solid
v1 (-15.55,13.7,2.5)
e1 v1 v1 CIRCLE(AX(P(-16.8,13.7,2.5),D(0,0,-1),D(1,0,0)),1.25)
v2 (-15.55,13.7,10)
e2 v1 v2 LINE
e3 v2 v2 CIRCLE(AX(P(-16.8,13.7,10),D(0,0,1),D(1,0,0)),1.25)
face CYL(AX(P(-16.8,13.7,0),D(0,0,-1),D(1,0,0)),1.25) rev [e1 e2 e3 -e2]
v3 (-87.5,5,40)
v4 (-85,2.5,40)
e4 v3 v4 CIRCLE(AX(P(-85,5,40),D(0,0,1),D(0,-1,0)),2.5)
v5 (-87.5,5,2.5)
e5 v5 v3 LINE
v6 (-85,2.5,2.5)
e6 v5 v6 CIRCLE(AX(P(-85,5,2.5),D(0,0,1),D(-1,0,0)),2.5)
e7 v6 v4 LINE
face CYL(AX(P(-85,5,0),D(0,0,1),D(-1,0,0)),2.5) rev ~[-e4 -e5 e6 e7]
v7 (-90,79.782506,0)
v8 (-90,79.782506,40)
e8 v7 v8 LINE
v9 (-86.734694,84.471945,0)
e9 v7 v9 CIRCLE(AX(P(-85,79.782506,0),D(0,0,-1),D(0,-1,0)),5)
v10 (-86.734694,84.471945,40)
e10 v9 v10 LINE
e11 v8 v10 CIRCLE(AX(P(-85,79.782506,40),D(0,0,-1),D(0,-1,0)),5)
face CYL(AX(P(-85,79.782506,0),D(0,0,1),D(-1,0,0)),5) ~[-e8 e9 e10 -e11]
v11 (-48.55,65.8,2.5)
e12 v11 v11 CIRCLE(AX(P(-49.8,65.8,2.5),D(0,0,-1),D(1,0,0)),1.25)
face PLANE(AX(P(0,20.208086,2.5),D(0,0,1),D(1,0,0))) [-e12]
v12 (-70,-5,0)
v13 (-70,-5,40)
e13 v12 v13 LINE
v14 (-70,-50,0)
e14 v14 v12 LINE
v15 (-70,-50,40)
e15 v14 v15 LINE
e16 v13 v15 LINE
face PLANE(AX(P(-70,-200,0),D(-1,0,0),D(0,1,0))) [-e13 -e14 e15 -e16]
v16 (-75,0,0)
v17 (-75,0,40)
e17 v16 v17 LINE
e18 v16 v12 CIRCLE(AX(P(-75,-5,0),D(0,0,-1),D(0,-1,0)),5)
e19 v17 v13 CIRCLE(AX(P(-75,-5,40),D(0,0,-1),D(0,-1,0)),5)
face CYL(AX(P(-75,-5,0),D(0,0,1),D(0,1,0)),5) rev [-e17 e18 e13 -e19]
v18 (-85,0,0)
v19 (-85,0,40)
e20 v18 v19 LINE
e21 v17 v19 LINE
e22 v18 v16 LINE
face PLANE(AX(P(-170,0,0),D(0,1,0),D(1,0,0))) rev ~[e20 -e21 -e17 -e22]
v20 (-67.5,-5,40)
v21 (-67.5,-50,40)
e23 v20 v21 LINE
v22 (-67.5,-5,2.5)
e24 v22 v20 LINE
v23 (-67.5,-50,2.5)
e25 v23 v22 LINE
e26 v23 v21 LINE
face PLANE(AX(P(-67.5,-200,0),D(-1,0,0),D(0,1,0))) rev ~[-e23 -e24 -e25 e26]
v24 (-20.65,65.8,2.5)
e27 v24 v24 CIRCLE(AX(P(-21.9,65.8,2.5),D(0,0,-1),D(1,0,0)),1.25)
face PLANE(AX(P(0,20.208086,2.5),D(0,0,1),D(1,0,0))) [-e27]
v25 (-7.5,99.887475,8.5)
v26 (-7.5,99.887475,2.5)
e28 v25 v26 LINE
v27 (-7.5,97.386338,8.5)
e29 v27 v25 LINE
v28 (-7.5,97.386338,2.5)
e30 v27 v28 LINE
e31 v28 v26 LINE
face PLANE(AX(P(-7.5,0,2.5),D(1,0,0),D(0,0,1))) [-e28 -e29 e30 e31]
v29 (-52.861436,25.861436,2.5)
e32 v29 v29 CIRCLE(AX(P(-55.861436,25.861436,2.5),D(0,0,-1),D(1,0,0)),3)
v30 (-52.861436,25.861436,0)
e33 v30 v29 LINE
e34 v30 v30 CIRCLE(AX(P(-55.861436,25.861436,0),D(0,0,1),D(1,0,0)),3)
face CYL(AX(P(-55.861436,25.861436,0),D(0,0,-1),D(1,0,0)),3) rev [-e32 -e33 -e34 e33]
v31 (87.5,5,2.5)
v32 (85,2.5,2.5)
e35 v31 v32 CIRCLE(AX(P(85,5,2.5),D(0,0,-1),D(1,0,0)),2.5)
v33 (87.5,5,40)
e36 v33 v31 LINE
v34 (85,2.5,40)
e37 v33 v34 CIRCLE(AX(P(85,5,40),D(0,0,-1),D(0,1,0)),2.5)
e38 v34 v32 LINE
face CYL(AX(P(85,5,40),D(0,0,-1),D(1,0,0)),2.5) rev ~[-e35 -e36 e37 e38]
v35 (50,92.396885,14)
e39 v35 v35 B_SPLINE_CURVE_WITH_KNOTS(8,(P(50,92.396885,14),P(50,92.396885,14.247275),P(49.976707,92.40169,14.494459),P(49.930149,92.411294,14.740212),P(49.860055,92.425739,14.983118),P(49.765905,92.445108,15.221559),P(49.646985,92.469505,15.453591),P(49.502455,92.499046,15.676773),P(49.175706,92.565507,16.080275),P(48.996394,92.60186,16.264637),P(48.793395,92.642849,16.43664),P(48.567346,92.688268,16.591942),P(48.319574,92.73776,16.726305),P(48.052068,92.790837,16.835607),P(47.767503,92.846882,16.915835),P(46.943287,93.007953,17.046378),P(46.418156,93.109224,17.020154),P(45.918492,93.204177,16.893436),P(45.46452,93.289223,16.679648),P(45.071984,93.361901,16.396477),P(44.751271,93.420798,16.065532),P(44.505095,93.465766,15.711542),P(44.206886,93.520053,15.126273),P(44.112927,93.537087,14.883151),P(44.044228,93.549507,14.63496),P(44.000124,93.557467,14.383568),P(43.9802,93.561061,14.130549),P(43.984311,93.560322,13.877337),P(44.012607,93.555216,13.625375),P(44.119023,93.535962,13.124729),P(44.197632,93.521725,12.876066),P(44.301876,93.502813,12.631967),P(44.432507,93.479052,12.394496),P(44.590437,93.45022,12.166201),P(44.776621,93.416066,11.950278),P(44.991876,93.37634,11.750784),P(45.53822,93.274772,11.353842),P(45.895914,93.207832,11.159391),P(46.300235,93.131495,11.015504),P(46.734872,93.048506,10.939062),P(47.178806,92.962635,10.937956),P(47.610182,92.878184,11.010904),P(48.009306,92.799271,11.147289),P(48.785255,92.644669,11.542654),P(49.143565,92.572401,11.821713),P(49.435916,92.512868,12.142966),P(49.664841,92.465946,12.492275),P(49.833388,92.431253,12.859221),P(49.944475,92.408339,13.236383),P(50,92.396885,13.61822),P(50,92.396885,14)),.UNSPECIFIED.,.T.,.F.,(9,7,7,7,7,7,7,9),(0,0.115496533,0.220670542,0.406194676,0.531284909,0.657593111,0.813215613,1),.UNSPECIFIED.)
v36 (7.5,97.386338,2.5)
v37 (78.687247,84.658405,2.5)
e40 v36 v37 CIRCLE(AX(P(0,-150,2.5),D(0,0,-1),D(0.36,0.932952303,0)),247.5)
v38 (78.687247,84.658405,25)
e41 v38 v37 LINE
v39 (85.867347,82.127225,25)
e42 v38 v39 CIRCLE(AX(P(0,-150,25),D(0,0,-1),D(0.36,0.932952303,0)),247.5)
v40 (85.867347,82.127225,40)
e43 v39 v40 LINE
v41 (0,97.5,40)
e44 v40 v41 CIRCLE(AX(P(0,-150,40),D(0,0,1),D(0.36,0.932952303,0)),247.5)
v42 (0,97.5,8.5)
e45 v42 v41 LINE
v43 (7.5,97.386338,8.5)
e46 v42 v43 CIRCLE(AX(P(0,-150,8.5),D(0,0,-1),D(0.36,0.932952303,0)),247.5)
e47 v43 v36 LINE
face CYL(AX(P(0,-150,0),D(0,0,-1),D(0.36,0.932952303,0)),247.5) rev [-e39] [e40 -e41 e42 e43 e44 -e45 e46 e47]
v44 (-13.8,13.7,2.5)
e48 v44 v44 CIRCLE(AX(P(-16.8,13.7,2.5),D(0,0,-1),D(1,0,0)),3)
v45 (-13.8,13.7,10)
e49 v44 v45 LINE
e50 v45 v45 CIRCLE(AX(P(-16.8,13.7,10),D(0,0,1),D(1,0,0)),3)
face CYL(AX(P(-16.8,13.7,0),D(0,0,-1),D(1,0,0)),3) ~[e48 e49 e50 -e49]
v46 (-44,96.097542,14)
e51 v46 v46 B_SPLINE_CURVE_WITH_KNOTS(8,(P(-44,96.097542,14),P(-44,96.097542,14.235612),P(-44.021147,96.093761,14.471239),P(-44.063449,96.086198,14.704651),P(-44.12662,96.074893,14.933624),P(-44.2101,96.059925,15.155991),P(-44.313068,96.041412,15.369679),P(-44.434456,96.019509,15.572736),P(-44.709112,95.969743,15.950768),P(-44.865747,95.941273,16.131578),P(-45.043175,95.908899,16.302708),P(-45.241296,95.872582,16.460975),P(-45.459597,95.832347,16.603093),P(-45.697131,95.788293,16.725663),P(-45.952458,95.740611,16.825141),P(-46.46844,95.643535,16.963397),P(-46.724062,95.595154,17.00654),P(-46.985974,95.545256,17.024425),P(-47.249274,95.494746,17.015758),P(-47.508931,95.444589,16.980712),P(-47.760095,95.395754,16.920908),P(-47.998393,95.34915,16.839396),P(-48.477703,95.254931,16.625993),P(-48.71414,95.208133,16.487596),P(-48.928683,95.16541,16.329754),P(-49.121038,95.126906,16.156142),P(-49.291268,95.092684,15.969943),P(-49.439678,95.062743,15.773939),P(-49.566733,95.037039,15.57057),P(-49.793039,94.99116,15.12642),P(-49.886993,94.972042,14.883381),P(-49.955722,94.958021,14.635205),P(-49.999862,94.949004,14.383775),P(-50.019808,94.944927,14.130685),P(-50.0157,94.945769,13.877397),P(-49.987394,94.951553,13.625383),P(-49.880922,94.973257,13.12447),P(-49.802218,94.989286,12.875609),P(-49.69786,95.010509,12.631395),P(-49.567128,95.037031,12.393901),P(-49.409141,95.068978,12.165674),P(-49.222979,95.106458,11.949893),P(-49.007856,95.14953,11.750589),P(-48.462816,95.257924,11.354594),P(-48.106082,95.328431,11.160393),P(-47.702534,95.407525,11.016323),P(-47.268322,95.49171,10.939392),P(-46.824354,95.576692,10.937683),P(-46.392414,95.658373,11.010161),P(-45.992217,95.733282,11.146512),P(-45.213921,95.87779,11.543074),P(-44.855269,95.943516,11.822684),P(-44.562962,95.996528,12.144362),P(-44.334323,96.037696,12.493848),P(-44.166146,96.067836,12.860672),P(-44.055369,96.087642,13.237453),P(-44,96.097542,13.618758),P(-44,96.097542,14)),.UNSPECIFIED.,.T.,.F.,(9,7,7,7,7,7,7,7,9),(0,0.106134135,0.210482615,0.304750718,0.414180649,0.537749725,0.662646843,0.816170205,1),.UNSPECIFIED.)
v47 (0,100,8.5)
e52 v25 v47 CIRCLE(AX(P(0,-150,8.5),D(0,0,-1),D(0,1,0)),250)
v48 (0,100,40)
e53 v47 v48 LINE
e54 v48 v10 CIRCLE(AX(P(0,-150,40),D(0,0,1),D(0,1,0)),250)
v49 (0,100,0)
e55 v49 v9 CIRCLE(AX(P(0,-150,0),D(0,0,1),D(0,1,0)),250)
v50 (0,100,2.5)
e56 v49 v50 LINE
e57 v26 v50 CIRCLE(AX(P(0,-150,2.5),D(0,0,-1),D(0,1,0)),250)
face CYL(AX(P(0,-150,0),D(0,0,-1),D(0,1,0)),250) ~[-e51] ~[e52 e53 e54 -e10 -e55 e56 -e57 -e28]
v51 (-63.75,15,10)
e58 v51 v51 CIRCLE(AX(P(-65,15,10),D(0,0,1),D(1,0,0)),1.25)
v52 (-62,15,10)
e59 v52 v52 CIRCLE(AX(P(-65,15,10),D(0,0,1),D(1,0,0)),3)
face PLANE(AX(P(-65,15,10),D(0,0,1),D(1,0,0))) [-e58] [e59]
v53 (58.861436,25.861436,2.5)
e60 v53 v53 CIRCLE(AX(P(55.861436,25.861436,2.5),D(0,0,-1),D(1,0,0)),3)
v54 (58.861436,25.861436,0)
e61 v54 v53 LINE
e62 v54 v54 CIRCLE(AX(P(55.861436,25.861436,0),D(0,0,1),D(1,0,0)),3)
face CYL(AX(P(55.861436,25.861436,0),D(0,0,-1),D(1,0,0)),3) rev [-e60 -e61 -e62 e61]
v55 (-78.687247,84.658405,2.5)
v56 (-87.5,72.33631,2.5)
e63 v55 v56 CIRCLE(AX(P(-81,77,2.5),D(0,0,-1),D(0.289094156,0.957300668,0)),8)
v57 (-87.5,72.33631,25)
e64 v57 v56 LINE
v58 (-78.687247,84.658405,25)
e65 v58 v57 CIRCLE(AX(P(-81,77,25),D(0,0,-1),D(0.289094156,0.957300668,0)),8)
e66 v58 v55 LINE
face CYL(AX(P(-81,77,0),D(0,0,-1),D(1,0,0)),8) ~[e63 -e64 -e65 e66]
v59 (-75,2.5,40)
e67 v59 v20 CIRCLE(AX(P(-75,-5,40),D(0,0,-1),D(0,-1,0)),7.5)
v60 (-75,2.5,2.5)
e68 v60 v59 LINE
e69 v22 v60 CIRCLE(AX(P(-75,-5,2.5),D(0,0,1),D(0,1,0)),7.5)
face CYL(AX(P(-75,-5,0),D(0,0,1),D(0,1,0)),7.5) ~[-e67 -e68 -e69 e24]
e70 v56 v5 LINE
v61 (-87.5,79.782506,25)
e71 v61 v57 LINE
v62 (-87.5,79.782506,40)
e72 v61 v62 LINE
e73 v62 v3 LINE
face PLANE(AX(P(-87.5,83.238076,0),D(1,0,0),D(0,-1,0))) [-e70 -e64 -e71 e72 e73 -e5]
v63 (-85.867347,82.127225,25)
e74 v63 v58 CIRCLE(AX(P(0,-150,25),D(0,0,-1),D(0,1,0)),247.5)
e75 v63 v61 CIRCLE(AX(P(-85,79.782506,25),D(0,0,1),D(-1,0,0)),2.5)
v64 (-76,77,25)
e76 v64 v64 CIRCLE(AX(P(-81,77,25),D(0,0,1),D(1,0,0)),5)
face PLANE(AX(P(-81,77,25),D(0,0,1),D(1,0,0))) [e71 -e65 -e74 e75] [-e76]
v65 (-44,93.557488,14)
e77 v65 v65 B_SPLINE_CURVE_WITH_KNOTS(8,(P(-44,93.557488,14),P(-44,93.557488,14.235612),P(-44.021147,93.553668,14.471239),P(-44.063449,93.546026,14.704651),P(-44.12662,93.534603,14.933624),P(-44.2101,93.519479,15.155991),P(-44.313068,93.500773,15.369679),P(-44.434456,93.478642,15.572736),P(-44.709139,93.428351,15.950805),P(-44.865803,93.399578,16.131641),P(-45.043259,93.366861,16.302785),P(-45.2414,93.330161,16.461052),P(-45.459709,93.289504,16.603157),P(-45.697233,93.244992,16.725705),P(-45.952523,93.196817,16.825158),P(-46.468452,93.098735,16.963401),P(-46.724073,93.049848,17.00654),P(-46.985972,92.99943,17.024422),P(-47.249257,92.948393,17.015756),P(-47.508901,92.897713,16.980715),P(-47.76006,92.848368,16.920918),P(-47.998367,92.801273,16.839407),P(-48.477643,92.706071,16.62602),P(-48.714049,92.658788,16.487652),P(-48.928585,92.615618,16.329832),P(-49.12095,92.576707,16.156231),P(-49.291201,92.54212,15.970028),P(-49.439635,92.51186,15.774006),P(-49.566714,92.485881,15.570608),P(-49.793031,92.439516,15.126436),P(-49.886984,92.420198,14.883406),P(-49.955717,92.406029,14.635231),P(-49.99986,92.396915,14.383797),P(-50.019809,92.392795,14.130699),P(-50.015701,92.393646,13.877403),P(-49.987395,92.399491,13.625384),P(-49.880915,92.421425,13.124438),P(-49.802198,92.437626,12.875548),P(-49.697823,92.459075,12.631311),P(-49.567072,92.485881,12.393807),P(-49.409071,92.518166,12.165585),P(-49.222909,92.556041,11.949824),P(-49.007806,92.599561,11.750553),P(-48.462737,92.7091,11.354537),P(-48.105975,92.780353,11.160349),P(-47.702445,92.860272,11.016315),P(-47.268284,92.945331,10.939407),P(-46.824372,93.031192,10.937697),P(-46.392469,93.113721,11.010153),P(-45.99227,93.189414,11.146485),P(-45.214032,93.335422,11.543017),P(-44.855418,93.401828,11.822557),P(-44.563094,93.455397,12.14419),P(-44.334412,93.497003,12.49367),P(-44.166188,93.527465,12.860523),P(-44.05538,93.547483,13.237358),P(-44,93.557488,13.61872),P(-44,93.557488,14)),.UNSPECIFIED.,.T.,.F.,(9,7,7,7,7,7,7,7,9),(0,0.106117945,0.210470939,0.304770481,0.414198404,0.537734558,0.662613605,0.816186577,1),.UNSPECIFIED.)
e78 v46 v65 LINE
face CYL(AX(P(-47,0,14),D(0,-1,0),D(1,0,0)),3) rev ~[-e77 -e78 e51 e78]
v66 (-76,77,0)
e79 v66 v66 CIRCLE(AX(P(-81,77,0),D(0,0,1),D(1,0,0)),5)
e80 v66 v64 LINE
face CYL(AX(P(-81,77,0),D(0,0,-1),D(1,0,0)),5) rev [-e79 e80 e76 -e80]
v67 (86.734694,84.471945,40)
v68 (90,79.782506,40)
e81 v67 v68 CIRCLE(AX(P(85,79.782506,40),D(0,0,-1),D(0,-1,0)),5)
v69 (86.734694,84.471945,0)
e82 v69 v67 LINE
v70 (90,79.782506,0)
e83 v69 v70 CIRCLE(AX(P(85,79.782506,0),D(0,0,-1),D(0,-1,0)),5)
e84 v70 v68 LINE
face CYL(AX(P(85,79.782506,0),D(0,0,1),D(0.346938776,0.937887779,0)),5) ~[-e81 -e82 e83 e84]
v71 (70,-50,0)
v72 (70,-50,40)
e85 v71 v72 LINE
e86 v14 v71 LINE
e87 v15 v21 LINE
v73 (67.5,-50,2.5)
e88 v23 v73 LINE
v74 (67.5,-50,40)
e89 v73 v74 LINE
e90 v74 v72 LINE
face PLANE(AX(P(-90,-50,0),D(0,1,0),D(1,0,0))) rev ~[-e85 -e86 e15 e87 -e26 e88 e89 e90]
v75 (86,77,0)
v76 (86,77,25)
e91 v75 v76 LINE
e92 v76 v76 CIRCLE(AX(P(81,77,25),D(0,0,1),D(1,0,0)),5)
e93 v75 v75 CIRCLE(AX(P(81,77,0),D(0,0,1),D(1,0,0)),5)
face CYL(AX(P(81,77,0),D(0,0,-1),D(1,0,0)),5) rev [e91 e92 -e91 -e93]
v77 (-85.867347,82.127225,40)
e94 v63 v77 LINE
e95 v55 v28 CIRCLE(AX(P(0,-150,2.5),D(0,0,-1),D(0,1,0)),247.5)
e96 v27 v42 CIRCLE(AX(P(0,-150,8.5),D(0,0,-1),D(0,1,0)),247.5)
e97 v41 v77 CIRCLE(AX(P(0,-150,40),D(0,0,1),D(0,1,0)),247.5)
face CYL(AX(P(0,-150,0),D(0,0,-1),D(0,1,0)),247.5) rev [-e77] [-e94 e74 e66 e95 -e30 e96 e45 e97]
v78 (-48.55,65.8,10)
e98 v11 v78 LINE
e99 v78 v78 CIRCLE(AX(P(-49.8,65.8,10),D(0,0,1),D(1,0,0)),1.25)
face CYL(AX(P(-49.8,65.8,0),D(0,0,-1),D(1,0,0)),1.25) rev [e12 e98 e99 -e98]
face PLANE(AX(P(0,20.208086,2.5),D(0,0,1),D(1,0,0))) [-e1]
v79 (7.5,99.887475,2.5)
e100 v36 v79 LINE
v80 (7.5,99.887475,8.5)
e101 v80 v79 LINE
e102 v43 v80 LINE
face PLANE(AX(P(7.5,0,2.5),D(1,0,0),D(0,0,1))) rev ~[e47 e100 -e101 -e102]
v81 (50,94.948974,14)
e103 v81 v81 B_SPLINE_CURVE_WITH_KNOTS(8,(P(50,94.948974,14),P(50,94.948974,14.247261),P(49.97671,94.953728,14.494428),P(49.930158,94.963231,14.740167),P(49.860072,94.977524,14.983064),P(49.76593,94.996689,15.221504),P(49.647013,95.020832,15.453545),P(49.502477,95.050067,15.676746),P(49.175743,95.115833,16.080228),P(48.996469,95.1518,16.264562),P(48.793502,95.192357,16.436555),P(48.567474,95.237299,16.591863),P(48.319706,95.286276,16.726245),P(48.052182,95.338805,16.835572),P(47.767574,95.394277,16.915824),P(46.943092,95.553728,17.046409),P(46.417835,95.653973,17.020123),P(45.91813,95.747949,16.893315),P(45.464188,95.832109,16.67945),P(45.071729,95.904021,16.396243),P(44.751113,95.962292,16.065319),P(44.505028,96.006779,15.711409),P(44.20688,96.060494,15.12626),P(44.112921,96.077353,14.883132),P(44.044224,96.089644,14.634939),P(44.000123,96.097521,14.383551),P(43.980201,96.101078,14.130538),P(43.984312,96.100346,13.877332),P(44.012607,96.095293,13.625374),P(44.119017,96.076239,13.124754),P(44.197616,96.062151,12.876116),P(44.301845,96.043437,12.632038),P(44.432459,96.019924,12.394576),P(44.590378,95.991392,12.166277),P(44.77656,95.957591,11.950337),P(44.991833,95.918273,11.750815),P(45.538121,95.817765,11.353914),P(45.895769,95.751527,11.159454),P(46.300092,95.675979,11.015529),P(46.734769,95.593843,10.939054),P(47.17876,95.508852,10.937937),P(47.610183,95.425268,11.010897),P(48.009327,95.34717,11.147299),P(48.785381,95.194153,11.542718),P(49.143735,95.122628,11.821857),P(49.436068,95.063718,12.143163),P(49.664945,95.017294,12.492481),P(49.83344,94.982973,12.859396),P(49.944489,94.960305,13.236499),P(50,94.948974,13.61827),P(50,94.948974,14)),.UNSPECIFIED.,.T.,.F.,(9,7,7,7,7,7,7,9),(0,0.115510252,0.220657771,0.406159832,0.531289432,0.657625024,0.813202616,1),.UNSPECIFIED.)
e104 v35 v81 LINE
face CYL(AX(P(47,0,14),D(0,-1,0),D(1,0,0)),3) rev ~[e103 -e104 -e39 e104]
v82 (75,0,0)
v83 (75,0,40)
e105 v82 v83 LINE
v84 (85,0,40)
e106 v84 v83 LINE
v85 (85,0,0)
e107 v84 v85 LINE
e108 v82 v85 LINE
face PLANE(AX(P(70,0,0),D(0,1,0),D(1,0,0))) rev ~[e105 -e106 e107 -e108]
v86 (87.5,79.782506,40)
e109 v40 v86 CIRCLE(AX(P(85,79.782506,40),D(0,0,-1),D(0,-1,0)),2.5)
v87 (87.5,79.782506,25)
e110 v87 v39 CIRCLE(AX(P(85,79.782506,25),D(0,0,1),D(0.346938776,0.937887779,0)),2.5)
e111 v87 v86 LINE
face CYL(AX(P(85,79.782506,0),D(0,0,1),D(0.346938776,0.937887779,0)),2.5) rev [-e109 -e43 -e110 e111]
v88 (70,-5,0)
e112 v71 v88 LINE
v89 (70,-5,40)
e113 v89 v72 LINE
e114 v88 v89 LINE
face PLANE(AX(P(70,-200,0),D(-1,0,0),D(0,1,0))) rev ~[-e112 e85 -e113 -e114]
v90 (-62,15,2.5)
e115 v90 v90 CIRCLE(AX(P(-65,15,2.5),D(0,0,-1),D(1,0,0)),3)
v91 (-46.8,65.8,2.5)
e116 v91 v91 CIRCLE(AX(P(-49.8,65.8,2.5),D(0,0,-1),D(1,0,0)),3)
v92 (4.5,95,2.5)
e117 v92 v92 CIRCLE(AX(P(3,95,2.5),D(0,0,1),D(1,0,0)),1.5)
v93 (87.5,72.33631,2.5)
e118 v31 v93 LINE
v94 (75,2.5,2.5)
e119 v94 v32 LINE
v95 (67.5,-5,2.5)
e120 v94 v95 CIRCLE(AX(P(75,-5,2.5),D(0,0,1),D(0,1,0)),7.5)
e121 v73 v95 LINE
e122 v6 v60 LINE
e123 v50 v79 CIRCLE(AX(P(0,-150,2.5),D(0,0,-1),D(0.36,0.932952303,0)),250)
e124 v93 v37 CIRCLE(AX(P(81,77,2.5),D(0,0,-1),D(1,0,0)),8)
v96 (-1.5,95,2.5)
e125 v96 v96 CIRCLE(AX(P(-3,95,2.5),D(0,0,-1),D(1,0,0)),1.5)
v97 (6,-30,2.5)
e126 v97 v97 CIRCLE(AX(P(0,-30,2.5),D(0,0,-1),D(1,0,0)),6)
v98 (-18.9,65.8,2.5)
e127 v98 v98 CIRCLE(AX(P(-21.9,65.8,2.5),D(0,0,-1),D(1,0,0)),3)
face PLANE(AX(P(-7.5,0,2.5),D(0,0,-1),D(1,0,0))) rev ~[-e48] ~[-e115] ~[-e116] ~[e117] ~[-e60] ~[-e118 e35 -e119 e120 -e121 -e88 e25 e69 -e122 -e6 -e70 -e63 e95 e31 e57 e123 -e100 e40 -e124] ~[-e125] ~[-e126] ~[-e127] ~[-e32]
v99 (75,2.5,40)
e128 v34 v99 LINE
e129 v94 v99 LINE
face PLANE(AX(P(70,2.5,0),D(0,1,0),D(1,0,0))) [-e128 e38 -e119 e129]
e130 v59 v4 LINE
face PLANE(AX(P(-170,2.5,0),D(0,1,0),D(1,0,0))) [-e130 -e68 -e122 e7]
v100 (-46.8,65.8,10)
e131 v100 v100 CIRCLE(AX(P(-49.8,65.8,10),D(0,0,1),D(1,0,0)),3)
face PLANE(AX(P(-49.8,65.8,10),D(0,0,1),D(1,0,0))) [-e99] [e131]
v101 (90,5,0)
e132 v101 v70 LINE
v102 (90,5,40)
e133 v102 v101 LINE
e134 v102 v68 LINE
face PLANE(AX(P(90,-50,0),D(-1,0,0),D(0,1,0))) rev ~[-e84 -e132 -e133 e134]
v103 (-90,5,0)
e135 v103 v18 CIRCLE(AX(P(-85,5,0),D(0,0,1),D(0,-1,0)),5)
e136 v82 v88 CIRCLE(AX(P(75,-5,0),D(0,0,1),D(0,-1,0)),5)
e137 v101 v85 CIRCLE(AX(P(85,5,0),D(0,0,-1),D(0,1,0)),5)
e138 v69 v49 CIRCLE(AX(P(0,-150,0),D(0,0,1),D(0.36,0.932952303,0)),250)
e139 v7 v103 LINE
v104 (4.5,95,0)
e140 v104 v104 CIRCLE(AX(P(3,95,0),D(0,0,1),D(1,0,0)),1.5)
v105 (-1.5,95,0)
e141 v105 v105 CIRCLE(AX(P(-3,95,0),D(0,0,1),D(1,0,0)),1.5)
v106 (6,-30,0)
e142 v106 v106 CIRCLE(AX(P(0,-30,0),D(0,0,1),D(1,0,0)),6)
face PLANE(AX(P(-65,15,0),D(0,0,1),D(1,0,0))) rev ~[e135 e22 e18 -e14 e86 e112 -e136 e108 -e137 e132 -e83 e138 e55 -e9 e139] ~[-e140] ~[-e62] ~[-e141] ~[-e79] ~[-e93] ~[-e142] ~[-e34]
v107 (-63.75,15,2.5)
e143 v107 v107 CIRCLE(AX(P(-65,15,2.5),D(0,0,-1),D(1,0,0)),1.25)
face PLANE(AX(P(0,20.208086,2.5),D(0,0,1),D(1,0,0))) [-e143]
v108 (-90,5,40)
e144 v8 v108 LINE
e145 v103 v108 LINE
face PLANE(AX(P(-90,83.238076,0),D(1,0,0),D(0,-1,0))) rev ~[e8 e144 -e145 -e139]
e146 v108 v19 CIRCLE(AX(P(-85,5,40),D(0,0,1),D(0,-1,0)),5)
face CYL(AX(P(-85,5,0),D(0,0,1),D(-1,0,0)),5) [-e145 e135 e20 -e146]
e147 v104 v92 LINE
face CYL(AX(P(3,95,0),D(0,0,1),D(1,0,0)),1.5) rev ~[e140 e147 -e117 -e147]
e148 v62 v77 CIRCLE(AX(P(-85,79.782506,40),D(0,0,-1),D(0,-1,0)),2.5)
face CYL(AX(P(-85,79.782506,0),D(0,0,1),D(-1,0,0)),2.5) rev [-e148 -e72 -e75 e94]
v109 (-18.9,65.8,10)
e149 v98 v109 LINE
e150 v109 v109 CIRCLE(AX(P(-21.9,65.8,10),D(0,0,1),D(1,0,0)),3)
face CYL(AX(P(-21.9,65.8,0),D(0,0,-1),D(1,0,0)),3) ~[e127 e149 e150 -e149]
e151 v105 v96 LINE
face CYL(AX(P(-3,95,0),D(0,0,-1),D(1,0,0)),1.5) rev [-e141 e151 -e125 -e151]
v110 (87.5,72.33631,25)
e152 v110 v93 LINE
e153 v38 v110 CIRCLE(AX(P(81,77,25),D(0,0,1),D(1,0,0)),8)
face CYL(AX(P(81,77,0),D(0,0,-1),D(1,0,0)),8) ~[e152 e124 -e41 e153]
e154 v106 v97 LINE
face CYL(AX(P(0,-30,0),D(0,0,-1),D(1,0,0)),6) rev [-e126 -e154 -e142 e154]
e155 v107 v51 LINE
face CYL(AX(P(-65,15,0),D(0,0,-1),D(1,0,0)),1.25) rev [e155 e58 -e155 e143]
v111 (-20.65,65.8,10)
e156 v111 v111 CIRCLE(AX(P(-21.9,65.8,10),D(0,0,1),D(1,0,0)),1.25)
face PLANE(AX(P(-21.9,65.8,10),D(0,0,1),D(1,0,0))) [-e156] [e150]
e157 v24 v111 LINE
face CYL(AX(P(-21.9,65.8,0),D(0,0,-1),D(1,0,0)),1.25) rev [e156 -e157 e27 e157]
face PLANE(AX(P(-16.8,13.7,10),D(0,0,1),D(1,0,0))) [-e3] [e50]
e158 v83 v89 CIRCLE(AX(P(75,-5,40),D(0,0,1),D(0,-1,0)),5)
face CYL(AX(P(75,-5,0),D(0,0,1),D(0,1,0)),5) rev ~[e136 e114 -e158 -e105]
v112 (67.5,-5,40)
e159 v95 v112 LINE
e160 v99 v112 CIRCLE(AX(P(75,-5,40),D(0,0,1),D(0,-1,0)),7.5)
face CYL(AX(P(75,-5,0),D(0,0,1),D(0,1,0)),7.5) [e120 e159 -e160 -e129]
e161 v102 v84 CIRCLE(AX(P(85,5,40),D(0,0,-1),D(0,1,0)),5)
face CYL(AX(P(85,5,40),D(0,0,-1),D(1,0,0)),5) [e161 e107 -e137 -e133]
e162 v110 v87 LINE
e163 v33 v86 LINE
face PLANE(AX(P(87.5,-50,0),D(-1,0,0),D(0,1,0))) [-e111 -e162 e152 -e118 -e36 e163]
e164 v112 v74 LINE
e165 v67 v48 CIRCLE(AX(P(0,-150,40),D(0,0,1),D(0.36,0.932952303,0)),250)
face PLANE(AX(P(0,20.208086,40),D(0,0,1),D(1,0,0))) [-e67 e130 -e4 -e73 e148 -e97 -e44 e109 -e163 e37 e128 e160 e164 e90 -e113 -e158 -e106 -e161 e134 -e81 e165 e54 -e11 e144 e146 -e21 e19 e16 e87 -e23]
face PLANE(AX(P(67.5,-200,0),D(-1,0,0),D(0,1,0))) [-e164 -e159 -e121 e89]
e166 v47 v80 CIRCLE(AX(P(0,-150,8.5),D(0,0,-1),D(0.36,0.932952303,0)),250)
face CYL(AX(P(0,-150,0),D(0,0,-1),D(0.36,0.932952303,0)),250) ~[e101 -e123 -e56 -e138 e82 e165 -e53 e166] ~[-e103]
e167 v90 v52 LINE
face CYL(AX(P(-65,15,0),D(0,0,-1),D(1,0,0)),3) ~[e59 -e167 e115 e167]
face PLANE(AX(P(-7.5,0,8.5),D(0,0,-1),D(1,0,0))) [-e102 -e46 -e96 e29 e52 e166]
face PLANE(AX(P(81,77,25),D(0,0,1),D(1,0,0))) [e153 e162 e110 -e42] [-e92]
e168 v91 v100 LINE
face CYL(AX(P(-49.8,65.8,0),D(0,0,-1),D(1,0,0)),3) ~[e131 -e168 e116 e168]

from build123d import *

# Parameters (mm, degrees)
F1_DEPTH  = 40
F2_W      = 100
F2_H      = 200
F3_DEPTH  = 100
F4_R      = 5
F5_T      = -2.5
F6_R      = 6
F7_DEPTH  = 25
F8_R      = 3
F9_DEPTH  = 25
F10_R     = 8
F11_DEPTH = 25
F12_R     = 5
F13_DEPTH = 25
F14_R     = 3
F14_R_2   = 1.25
F15_DEPTH = 10
F16_R     = 3
F17_DEPTH = 150
F18_W     = 15
F18_H     = 6
F19_DEPTH = 250
F20_R     = 1.5
F21_DEPTH = 12.5


with BuildPart() as f1:
    # F0 (on Top) → F1 (new body)
    with BuildSketch(Plane.XY):
        with BuildLine():
            Line((-90, 83.2380757938), (-90, -50))
            Line((-90, -50), (90, -50))
            Line((90, -50), (90, 83.2380757938))
            ThreePointArc((90, 83.2380757938), (45.7737973711, 95.7737973711), (0, 100))
            ThreePointArc((0, 100), (-45.7737973711, 95.7737973711), (-90, 83.2380757938))
        make_face()
    extrude(amount=F1_DEPTH)

    # F2 (on Top) → F3 (cut)
    with BuildSketch(Plane.XY):
        with Locations((-120, -100)):
            Rectangle(F2_W, F2_H)
        with Locations((120, -100)):
            Rectangle(F2_W, F2_H)
    extrude(amount=F3_DEPTH, mode=Mode.SUBTRACT)

    # F4
    f4_edges = [f1.edges().sort_by_distance(p)[0] for p in [
        (-90, 83.238076, 20),
        (90, 83.238076, 20),
        (90, 0, 20),
        (70, 0, 20),
        (-90, 0, 20),
        (-70, 0, 20),
    ]]
    fillet(f4_edges, radius=F4_R)

    # F5
    f5_openings = [f1.faces().sort_by_distance(p)[0] for p in [
        (0, 26.262097, 40),
        (0, -50, 20),
    ]]
    offset(amount=F5_T, openings=f5_openings)

    # F6 (on Top) → F7 (cut)
    with BuildSketch(Plane.XY):
        with Locations((0, -30)):
            Circle(F6_R)
    extrude(amount=F7_DEPTH, mode=Mode.SUBTRACT)

    # F8 (on Top) → F9 (cut)
    with BuildSketch(Plane.XY):
        with Locations((-55.8614357137, 25.8614357137)):
            Circle(F8_R)
        with Locations((55.8614357137, 25.8614357137)):
            Circle(F8_R)
    extrude(amount=F9_DEPTH, mode=Mode.SUBTRACT)

    # F10 (on Top) → F11 (join)
    with BuildSketch(Plane.XY):
        with Locations((-81, 77)):
            Circle(F10_R)
        with Locations((81, 77)):
            Circle(F10_R)
    extrude(amount=F11_DEPTH)

    # F12 (on Top) → F13 (cut)
    with BuildSketch(Plane.XY):
        with Locations((-81, 77)):
            Circle(F12_R)
        with Locations((81, 77)):
            Circle(F12_R)
    extrude(amount=F13_DEPTH, mode=Mode.SUBTRACT)

    # F14 (on Top) → F15 (join)
    with BuildSketch(Plane.XY):
        with Locations((-65, 15)):
            Circle(F14_R)
        with Locations((-65, 15)):
            Circle(F14_R_2, mode=Mode.SUBTRACT)
        with Locations((-49.8, 65.8)):
            Circle(F14_R)
        with Locations((-49.8, 65.8)):
            Circle(F14_R_2, mode=Mode.SUBTRACT)
        with Locations((-21.9, 65.8)):
            Circle(F14_R)
        with Locations((-21.9, 65.8)):
            Circle(F14_R_2, mode=Mode.SUBTRACT)
        with Locations((-16.8, 13.7)):
            Circle(F14_R)
        with Locations((-16.8, 13.7)):
            Circle(F14_R_2, mode=Mode.SUBTRACT)
    extrude(amount=F15_DEPTH)

    # F16 (on Front) → F17 (cut, symmetric)
    with BuildSketch(Plane.XZ):
        with Locations((47, 14)):
            Circle(F16_R)
        with Locations((-47, 14)):
            Circle(F16_R)
    extrude(amount=F17_DEPTH, both=True, mode=Mode.SUBTRACT)

    # F18 (on Front) → F19 (cut)
    with BuildSketch(Plane.XZ):
        with Locations((0, 5.5)):
            Rectangle(F18_W, F18_H)
    extrude(amount=-F19_DEPTH, mode=Mode.SUBTRACT)

    # F20 (on Top) → F21 (cut, symmetric)
    with BuildSketch(Plane.XY):
        with Locations((-3, 95)):
            Circle(F20_R)
        with Locations((3, 95)):
            Circle(F20_R)
    extrude(amount=F21_DEPTH, both=True, mode=Mode.SUBTRACT)


solid = f1.part
